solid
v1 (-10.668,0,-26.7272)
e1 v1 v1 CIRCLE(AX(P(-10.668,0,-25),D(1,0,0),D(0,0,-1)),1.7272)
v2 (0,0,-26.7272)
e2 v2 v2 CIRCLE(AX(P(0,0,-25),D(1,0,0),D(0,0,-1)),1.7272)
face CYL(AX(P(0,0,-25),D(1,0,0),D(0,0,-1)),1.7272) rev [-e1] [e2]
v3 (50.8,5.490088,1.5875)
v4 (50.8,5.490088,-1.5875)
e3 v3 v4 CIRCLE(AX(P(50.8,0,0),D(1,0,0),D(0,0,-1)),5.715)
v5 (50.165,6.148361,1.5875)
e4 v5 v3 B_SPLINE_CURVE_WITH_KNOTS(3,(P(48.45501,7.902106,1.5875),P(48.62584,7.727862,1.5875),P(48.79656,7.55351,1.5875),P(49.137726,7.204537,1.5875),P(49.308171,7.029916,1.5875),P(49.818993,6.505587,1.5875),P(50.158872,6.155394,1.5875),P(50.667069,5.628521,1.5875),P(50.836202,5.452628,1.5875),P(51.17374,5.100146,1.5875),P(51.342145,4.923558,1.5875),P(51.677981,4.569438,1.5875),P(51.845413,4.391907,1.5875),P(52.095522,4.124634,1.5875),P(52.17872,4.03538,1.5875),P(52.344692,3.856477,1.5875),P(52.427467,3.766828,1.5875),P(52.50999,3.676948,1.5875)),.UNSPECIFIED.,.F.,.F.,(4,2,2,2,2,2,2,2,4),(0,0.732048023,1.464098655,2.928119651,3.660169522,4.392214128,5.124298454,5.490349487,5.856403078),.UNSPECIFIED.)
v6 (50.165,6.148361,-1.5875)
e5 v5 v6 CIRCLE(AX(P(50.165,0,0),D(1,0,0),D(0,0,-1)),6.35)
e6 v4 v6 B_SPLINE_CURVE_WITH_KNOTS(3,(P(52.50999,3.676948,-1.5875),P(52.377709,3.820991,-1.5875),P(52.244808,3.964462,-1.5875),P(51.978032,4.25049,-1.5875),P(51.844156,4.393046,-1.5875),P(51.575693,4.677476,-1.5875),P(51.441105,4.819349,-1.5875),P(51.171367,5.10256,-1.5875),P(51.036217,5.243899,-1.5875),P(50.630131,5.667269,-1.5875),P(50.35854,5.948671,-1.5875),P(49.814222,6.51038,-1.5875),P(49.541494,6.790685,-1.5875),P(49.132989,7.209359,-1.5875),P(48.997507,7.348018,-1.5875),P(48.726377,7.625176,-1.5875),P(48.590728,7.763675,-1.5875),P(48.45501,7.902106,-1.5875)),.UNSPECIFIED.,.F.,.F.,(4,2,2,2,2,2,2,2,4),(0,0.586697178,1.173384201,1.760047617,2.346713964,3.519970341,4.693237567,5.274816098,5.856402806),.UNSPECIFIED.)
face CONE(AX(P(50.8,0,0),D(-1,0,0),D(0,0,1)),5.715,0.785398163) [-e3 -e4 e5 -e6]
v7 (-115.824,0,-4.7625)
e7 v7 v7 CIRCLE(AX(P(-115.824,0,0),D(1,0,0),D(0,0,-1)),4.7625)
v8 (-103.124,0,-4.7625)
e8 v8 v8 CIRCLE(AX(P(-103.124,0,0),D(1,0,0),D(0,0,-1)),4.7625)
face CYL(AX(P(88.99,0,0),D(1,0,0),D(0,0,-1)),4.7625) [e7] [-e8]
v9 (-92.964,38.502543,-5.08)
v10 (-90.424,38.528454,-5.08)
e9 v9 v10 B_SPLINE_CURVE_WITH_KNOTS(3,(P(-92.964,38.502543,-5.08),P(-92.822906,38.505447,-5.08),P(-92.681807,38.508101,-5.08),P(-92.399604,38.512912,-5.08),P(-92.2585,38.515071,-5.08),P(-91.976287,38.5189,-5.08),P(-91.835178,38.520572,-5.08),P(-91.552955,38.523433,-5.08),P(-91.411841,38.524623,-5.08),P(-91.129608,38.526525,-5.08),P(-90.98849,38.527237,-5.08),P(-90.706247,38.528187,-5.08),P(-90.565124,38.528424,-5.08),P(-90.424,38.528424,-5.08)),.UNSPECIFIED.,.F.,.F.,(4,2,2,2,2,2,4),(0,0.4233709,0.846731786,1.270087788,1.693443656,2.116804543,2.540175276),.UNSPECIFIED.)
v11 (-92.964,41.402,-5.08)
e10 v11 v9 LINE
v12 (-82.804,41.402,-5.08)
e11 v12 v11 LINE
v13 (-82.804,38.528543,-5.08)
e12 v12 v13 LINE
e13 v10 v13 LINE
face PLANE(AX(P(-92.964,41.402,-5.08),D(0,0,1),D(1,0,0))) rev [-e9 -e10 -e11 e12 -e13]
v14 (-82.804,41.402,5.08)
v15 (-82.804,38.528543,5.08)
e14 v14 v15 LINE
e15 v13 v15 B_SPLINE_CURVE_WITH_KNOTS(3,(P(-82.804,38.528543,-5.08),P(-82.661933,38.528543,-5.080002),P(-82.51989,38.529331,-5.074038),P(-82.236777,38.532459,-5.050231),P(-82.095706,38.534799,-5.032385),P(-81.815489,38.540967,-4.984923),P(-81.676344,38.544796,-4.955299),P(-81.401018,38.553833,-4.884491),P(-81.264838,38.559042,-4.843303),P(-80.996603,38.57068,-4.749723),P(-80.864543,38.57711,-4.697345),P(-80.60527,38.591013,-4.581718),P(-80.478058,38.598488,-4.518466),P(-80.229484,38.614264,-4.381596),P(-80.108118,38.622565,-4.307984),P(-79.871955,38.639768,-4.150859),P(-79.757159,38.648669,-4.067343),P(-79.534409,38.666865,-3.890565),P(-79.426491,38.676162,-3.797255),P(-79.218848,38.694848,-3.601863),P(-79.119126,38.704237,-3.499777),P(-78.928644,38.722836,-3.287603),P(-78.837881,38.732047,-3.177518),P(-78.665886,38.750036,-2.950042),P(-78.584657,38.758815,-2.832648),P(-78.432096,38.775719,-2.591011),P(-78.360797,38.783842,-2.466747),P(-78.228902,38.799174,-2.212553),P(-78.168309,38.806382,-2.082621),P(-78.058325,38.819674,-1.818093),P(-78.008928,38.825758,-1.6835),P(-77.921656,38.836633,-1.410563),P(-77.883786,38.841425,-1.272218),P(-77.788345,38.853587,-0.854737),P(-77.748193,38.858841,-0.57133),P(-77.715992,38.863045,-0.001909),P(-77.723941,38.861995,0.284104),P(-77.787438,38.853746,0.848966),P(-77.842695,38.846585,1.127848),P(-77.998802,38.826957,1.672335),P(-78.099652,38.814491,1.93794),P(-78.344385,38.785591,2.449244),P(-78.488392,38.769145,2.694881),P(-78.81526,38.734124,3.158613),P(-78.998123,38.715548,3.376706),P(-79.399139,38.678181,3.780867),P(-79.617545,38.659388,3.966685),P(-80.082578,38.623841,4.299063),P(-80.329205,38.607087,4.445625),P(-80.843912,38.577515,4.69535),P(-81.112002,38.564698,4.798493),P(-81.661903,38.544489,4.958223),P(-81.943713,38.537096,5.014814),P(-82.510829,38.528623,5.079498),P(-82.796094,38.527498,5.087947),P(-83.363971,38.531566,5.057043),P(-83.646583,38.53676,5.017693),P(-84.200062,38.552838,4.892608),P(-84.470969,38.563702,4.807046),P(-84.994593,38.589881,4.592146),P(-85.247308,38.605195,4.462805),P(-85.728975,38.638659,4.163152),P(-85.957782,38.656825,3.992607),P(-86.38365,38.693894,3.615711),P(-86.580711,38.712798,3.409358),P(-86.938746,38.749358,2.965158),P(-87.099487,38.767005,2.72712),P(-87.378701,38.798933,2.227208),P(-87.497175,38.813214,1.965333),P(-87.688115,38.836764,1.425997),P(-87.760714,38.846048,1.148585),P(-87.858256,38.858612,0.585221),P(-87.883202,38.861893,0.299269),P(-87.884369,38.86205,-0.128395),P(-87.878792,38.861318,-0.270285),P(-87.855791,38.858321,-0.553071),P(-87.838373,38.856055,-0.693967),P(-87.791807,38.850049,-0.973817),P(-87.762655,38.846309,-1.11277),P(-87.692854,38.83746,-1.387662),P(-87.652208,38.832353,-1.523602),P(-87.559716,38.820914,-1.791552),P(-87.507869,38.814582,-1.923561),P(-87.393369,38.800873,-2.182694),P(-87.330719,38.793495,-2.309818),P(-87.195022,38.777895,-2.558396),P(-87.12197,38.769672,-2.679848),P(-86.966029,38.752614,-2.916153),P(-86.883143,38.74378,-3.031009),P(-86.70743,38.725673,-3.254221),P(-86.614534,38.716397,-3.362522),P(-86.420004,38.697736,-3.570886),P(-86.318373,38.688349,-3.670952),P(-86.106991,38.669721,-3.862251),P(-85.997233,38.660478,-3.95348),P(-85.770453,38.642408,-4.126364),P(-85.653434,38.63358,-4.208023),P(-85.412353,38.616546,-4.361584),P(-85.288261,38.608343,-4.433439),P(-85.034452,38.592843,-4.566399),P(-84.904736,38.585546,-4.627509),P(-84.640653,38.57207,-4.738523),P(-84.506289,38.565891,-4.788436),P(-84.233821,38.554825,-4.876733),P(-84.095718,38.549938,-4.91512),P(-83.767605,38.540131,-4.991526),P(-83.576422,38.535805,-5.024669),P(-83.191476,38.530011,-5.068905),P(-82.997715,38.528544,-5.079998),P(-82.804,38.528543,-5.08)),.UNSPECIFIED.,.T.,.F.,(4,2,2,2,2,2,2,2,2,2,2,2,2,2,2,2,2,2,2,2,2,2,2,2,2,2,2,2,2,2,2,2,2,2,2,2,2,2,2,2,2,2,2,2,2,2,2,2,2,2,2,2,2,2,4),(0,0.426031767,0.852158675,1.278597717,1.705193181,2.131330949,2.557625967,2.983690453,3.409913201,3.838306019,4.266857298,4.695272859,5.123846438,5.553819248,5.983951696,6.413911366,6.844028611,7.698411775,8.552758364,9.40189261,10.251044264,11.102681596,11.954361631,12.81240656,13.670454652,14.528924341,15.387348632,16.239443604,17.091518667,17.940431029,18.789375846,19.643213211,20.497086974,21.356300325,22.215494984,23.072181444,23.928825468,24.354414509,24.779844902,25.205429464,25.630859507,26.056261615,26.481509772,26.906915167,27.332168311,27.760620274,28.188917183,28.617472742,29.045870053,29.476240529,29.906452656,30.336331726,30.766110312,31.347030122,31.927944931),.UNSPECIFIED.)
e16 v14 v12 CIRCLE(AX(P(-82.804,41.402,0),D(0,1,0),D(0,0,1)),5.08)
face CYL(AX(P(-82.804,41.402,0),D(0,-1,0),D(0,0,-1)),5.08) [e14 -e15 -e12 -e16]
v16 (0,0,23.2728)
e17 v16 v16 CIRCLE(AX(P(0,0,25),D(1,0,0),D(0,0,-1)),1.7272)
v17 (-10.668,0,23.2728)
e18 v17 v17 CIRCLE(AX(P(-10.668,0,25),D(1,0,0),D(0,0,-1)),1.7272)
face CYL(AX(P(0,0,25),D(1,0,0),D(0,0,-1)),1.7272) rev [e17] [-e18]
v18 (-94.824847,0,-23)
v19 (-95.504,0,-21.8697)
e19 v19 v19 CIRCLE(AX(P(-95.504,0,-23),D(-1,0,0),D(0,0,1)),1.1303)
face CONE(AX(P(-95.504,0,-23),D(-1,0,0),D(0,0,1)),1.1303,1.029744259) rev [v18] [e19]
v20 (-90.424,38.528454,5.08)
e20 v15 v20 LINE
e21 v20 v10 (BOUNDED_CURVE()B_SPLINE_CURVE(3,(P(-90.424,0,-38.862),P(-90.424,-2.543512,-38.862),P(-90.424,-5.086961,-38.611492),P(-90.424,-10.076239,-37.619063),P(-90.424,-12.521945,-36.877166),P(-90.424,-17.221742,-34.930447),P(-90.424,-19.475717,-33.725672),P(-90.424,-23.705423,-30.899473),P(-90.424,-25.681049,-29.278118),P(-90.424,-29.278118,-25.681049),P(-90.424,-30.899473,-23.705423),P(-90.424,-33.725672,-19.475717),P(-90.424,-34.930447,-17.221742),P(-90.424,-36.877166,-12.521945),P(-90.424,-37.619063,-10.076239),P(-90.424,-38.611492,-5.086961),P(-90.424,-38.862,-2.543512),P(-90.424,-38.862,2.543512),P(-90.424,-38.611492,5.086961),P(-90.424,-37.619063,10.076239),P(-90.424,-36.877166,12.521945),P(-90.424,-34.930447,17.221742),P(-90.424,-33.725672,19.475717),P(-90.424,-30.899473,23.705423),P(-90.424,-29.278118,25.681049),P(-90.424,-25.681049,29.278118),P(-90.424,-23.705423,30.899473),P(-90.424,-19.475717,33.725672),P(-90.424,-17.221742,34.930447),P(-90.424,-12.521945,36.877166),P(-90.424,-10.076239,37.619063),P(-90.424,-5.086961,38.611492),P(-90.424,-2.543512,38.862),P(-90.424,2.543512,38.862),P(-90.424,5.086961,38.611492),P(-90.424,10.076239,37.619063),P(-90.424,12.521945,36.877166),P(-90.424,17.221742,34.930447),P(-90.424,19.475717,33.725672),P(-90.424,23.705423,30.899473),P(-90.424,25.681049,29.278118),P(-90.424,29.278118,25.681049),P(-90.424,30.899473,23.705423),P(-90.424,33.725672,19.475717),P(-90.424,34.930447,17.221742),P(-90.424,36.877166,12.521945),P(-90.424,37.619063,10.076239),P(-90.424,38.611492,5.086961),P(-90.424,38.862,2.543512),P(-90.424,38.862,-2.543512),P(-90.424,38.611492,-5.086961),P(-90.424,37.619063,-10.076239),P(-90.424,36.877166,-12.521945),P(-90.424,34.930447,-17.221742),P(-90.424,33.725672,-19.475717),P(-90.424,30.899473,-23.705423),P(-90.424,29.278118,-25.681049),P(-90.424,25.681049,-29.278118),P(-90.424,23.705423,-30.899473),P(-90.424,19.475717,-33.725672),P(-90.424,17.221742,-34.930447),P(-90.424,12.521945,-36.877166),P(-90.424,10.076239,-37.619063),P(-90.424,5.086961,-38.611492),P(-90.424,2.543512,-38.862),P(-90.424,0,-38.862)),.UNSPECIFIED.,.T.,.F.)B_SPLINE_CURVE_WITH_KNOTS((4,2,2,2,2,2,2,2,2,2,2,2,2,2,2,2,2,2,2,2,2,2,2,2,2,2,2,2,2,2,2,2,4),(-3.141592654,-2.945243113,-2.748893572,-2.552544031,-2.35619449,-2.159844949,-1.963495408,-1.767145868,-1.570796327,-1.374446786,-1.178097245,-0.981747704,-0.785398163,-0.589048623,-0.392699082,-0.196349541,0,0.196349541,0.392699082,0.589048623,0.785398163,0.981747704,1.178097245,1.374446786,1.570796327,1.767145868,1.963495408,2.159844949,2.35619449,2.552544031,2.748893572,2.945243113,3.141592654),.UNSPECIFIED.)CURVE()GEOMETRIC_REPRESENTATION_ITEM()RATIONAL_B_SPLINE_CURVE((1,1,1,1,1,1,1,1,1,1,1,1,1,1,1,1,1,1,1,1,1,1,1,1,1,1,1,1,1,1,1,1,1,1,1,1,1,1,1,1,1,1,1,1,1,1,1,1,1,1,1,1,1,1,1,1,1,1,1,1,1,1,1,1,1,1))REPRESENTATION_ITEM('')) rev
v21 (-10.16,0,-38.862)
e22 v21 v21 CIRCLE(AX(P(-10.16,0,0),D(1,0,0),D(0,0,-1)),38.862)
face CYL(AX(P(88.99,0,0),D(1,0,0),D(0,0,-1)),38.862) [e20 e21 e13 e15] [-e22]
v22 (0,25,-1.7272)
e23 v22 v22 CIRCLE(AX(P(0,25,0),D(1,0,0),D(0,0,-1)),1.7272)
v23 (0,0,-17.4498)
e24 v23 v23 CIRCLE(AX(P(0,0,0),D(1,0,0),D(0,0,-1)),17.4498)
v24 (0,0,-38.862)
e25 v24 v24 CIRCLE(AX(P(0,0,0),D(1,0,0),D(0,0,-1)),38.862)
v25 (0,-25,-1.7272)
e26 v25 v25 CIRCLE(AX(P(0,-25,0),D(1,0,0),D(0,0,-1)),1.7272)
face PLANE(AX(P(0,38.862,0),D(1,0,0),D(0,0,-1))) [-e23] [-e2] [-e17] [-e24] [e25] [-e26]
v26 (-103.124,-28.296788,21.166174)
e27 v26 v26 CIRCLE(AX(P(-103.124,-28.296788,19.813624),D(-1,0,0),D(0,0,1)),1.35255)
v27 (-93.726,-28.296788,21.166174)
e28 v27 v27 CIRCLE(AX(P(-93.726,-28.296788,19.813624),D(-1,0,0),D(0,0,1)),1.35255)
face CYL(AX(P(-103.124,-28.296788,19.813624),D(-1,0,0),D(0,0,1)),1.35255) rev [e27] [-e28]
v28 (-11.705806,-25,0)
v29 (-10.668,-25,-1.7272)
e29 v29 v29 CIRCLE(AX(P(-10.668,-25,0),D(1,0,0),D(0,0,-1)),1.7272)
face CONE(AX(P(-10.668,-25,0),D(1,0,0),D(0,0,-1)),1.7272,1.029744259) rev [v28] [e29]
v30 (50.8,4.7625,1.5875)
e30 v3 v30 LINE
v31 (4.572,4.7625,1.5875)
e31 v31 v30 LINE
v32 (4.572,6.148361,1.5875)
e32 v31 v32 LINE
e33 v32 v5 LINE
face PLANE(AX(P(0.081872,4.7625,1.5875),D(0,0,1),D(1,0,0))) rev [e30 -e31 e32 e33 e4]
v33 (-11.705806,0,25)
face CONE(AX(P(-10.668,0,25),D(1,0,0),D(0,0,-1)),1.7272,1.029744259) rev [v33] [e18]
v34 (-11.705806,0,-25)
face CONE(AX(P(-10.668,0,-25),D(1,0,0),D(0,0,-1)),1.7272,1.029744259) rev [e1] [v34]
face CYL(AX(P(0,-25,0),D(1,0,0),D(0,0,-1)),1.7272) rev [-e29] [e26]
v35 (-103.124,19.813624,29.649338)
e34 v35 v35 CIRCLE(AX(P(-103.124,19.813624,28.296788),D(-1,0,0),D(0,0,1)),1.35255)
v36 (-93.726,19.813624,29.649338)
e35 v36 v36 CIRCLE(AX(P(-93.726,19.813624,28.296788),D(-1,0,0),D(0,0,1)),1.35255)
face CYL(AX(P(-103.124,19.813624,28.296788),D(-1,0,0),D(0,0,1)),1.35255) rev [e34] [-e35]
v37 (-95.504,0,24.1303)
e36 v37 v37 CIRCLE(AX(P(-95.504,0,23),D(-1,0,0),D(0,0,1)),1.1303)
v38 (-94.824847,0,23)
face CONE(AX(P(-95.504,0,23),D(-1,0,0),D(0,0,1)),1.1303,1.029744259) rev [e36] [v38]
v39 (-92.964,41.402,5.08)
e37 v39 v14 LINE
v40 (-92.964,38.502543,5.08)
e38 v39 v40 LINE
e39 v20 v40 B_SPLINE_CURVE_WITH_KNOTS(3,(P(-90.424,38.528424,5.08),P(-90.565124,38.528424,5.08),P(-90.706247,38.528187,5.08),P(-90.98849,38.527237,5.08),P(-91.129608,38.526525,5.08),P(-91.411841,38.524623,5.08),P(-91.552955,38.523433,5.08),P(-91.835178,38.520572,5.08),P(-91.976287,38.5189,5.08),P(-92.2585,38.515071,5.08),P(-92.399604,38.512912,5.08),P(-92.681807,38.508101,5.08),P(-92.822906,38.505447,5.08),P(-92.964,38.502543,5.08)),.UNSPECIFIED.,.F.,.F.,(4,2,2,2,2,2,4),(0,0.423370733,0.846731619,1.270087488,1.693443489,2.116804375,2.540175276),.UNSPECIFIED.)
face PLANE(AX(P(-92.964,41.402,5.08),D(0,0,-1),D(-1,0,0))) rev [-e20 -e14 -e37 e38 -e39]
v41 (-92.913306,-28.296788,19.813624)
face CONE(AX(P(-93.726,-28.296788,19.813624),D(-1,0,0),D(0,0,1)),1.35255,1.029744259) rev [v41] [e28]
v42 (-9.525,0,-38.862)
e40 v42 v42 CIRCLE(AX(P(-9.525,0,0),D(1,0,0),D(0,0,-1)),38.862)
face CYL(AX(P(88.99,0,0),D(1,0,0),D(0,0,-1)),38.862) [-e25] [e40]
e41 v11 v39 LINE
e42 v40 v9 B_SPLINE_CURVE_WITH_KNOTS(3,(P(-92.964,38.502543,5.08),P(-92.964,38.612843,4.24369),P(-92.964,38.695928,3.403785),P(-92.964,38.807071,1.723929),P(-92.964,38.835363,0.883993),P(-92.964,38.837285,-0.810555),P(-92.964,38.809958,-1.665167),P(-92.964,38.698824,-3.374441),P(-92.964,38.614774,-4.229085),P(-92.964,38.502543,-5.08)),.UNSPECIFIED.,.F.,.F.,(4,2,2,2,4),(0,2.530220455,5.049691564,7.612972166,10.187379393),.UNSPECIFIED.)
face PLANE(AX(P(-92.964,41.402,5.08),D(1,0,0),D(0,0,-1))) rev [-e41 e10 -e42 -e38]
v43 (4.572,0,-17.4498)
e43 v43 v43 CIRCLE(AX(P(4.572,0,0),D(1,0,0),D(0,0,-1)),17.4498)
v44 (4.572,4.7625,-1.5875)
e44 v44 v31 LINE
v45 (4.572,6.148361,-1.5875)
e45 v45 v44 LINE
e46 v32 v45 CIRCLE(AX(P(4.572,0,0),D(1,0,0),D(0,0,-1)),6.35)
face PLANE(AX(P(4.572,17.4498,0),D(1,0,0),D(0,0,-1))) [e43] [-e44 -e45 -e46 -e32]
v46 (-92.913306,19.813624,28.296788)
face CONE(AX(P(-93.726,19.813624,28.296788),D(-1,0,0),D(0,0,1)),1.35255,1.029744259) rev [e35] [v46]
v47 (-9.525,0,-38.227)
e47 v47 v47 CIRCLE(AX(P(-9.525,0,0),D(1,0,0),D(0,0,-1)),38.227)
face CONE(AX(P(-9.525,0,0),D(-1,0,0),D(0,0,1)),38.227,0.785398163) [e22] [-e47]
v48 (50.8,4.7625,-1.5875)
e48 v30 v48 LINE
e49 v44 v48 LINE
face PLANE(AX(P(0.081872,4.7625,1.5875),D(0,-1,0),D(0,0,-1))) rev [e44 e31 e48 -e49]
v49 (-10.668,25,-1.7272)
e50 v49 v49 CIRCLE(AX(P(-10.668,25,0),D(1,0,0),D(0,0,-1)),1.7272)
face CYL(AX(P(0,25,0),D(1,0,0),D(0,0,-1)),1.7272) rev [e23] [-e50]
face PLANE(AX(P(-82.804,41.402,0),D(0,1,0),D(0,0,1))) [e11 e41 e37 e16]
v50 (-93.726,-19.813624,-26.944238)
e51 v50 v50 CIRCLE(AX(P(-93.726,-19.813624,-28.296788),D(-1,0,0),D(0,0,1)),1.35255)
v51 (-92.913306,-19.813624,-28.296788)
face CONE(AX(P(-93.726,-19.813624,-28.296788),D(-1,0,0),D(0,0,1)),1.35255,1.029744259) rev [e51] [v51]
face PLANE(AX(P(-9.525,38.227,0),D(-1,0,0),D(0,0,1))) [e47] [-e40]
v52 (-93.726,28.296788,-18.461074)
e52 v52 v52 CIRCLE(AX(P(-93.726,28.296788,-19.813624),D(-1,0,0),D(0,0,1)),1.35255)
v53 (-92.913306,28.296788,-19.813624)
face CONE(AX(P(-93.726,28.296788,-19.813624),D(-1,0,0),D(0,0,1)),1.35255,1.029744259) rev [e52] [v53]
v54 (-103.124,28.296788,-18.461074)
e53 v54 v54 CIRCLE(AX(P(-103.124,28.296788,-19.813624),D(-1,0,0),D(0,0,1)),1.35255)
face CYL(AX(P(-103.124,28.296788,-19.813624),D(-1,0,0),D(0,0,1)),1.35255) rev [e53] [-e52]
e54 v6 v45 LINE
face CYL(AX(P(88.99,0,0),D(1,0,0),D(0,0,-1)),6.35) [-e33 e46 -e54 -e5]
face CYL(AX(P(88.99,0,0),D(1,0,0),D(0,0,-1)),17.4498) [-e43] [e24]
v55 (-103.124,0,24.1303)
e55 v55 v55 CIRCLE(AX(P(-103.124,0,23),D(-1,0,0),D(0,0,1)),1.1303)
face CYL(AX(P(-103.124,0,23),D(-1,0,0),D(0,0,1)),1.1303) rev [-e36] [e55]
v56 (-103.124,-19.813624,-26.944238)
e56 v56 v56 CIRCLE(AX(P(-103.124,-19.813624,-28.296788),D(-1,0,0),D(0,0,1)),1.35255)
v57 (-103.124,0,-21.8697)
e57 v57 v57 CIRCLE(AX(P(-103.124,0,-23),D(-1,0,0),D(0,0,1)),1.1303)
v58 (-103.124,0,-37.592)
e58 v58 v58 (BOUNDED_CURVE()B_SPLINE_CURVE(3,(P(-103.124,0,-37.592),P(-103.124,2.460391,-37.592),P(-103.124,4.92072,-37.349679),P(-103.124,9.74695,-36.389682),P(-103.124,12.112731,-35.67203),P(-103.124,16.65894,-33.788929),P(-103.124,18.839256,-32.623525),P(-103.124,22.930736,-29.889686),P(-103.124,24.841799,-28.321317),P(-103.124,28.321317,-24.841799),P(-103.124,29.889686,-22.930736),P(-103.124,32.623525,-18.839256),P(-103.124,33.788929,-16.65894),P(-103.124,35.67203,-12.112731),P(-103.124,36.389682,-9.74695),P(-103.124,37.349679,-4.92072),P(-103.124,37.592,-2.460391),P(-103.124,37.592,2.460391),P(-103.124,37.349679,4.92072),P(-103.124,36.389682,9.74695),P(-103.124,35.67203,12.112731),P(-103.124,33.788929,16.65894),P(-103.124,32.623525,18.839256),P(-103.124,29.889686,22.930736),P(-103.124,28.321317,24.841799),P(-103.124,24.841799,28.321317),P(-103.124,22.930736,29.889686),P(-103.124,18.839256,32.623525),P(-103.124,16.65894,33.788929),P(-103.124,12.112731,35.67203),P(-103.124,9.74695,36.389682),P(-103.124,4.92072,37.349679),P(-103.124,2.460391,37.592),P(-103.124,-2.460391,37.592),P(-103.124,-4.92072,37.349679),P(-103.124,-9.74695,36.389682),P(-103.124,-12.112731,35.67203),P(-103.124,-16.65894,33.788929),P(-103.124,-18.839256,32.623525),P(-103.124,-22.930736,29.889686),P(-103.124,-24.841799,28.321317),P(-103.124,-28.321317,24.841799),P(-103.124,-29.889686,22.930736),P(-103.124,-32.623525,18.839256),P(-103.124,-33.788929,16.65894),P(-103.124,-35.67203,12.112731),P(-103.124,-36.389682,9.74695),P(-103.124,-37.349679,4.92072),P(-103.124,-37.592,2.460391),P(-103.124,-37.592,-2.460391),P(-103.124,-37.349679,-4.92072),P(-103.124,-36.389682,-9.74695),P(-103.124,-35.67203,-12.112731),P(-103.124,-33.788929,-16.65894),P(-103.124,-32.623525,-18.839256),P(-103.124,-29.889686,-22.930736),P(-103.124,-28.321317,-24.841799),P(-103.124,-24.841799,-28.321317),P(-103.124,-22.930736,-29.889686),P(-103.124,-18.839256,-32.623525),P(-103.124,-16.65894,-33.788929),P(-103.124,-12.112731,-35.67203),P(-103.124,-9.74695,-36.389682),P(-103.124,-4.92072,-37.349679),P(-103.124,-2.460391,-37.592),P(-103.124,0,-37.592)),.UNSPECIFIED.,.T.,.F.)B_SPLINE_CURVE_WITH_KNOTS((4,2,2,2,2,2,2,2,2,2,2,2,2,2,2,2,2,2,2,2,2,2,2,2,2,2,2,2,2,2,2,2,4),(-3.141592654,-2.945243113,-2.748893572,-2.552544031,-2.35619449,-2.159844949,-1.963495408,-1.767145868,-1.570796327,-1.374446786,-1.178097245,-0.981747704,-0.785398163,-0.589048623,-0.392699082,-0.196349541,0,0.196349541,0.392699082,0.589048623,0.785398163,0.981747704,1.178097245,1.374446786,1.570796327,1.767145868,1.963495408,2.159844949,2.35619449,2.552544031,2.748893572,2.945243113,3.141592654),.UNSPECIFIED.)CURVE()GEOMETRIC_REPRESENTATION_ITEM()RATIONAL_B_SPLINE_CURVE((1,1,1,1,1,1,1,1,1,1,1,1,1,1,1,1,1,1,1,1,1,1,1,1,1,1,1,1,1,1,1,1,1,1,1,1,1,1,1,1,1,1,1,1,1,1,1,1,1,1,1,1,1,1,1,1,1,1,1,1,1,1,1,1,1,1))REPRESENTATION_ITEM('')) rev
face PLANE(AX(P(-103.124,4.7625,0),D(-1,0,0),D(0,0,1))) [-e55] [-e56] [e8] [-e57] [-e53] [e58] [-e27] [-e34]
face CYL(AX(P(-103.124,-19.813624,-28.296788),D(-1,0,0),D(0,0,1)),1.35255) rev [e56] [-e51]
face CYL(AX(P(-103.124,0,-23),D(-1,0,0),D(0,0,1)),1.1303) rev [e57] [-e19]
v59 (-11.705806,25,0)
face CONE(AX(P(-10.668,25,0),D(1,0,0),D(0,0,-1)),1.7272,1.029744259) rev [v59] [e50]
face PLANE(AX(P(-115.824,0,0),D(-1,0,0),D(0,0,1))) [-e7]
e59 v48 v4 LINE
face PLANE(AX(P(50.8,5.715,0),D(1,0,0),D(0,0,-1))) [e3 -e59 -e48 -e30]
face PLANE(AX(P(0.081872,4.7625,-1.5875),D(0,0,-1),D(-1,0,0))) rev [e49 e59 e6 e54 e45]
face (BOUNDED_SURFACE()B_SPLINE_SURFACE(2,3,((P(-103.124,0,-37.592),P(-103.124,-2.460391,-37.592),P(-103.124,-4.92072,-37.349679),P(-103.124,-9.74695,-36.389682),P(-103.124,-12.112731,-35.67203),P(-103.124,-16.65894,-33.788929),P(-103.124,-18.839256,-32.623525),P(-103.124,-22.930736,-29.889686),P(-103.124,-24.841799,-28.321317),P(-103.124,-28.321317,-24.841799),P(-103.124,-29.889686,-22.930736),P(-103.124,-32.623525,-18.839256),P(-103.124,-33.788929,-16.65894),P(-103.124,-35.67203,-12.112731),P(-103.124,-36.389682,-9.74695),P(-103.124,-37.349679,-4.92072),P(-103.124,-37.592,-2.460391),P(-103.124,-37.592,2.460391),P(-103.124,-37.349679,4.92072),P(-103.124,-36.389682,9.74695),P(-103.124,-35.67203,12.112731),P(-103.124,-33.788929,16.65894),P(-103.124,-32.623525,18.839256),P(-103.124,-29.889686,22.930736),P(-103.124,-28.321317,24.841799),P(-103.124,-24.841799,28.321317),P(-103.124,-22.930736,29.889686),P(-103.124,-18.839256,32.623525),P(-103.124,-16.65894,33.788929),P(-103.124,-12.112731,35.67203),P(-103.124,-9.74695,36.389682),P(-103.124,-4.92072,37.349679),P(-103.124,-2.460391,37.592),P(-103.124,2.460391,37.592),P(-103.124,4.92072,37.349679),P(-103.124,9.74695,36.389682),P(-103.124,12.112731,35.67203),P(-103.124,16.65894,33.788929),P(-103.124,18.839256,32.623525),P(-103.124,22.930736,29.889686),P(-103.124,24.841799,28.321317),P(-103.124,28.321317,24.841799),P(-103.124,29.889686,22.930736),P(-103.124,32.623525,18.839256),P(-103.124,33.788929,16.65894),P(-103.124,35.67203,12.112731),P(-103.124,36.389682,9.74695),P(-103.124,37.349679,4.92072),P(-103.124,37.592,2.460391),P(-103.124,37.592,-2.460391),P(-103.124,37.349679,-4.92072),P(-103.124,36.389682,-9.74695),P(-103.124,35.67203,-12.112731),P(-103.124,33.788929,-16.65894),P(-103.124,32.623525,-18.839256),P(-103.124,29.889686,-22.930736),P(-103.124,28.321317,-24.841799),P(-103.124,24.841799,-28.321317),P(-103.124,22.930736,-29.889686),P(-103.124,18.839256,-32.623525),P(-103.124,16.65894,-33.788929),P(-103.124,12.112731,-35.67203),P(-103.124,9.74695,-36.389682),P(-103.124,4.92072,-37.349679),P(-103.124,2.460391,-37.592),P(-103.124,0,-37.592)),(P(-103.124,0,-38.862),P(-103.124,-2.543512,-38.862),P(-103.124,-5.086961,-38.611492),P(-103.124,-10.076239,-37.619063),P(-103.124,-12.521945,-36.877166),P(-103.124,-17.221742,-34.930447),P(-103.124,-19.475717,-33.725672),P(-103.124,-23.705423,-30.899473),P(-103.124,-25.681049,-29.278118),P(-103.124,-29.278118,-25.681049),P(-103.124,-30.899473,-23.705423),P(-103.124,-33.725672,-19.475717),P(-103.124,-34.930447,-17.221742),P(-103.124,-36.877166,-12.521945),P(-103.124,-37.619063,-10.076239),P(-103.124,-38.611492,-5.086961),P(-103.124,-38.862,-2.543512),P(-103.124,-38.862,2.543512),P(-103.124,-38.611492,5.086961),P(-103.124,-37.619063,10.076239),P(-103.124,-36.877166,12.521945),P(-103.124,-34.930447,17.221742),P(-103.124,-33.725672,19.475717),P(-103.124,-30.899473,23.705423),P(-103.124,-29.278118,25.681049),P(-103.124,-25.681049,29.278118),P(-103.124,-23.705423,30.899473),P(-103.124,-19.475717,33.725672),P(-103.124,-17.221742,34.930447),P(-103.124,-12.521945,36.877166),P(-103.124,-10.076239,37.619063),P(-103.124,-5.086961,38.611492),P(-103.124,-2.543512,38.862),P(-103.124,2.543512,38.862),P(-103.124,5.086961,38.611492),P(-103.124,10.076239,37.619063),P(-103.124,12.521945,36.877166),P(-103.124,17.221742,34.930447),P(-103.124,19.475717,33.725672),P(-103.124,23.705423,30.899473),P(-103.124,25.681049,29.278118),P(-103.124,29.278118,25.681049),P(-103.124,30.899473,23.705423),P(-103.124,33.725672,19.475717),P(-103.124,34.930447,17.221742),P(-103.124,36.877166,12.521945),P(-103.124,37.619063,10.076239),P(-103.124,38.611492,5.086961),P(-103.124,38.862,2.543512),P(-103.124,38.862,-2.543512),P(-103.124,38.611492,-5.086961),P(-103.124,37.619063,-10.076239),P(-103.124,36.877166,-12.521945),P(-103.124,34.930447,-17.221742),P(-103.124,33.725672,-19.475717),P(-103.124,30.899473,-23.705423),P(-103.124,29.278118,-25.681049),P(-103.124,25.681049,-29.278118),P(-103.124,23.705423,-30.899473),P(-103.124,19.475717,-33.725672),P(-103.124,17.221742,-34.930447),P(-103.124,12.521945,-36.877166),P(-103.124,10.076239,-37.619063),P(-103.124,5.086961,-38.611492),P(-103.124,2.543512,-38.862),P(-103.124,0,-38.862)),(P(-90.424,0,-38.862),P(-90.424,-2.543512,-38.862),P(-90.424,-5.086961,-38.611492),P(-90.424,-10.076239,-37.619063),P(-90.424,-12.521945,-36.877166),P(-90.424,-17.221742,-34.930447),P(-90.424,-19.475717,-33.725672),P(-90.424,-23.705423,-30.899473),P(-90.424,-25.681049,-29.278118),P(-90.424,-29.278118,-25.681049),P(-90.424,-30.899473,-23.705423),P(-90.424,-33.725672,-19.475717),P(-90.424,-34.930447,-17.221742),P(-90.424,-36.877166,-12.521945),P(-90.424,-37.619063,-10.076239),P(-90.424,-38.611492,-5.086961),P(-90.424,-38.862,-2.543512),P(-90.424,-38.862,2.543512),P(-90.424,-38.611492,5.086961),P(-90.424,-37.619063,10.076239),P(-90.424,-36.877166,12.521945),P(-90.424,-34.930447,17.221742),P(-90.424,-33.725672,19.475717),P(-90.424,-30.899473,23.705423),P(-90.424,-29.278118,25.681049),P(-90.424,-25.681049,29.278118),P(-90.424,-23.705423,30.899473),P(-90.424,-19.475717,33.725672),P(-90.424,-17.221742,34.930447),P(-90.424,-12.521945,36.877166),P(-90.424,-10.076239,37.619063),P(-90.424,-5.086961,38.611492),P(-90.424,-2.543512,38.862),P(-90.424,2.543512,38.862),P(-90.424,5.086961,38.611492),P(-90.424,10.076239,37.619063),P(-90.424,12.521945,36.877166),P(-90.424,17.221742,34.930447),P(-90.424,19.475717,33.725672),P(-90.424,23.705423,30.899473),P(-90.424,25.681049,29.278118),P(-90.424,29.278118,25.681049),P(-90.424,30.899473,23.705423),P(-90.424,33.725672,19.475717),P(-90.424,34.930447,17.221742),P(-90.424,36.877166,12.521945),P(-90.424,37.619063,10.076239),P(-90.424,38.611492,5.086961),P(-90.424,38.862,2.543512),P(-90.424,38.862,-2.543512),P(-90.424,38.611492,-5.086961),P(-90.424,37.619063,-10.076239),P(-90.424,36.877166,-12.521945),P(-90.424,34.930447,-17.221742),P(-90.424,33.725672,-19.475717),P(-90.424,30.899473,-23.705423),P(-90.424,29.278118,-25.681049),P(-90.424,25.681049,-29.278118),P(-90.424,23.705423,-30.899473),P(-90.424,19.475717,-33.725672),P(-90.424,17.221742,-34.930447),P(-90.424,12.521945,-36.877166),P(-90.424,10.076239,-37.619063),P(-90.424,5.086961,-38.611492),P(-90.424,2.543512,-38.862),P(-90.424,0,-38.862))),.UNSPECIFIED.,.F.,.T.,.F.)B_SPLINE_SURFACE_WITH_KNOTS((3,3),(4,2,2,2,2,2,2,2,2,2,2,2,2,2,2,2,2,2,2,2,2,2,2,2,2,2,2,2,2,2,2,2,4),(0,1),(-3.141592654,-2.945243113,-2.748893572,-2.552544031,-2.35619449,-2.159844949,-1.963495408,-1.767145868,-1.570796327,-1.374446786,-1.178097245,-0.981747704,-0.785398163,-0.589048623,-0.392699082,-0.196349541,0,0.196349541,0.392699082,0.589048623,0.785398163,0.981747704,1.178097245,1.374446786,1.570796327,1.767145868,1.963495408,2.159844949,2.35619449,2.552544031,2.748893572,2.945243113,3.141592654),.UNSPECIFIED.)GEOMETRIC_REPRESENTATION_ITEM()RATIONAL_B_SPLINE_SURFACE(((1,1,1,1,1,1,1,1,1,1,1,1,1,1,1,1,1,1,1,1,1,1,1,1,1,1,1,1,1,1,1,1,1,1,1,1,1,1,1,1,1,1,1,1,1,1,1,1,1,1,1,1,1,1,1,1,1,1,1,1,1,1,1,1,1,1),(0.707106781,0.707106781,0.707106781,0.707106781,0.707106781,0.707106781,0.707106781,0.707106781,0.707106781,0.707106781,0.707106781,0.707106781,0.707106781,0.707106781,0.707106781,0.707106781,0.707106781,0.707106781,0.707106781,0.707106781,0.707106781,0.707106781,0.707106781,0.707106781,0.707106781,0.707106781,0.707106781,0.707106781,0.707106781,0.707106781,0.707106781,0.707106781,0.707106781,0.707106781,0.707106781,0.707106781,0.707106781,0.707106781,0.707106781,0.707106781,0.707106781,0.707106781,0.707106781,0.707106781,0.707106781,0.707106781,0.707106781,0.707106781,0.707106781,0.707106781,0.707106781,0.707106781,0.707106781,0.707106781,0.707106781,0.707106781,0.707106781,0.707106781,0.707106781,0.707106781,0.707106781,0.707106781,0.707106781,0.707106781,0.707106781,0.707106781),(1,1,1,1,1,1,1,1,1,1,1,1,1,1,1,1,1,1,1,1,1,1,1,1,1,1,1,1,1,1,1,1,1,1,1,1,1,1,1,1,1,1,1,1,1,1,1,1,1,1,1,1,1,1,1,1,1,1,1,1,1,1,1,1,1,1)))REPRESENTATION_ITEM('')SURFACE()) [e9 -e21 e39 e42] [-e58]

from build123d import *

# Parameters (mm, degrees)
FILLET1_SIZE              = 1.27
FILLET1_SIZE_2            = 12.7
SKETCH3_W                 = 3.175
SKETCH3_H                 = 3.175
CUT_EXTRUDE1_DEPTH        = 46.228
F_4_40_TAPPED_HOLE1_D     = 2.2606
F_4_40_TAPPED_HOLE1_DEPTH = 7.62
F_4_40_TAPPED_HOLE1_TIP   = 0.679152758
CIRPATTERN1_COUNT         = 4
BOSS_EXTRUDE1_DEPTH       = 41.402


# Read off the part's stored shape, not the designer's step: #6-32 Tapped Hole1
with BuildPart() as part:
    # Sketch2 → Revolve1 (revolve)
    with BuildSketch(Plane.XY, mode=Mode.PRIVATE) as revolve1_sk:
        Polygon((50.8, 0), (-115.824, 0), (-115.824, 4.7625), (-103.124, 4.7625), (-103.124, 38.862), (-10.16, 38.862), (-9.525, 38.227), (-9.525, 38.862), (0, 38.862), (0, 17.4498), (4.572, 17.4498), (4.572, 6.35), (50.165, 6.35), (50.8, 5.715), align=None)
    revolve(revolve1_sk.sketch.rotate(Axis((88.99, 0, 0), (-1, 0, 0)), 90), axis=Axis((88.99, 0, 0), (-1, 0, 0)))

    # Fillet1
    # an asymmetric fillet: 12.7, 1.27 mm, written as the material it takes off along each edge
    with BuildSketch(Plane(origin=(-103.124, 0, 0), x_dir=(0, 0, -1), z_dir=(0, 1, 0))) as fillet1_piece_1:
        with BuildLine():
            Bezier((38.862 - FILLET1_SIZE, 0), (38.862, 0), (38.862, -FILLET1_SIZE_2), weights=[1, 0.707106781, 1])
            Line((38.862, -FILLET1_SIZE_2), (38.862, 0))
            Line((38.862, 0), (38.862 - FILLET1_SIZE, 0))
        make_face()
    revolve(axis=Axis((-103.124, 0, 0), (-1, 0, 0)), mode=Mode.SUBTRACT)

    # Sketch3 → Cut-Extrude1 (cut)
    with BuildSketch(Plane(origin=(50.8, 0, 0), x_dir=(0, 0, -1), z_dir=(1, 0, 0))):
        with Locations((0, 6.35)):
            Rectangle(SKETCH3_W, SKETCH3_H)
    extrude(amount=-CUT_EXTRUDE1_DEPTH, mode=Mode.SUBTRACT)

    # Sketch8 → #8-32 Tapped Hole3 (revolve, cut)
    with BuildSketch(Plane(origin=(0, 0, -25), x_dir=(0, 0, -1), z_dir=(0, 1, 0))):
        Polygon((0, 0), (0, 11.705806461), (1.7272, 10.668), (1.7272, 0), align=None)
    f_8_32_tapped_hole3 = revolve(axis=Axis((6.35, 0, -25), (-1, 0, 0)), mode=Mode.SUBTRACT)

    # #6-32 Tapped Hole1 outline → #6-32 Tapped Hole1 (revolve, cut)
    with BuildSketch(Plane(origin=(0, 19.813624417, 28.296788218), x_dir=(0, 1, 0), z_dir=(0, 0, -1))):
        Polygon((1.35255, -93.726), (0, -92.91330597), (0, -103.124), (1.35255, -103.124), align=None)
    f_6_32_tapped_hole1 = revolve(axis=Axis((0, 19.813624417, 28.296788218), (1, 0, 0)), mode=Mode.SUBTRACT)

    # #4-40 Tapped Hole1
    with Locations(Plane.ZY.offset(103.124)):
        with Locations((-23, 0), (23, 0)):
            Hole(F_4_40_TAPPED_HOLE1_D / 2, depth=F_4_40_TAPPED_HOLE1_DEPTH)
            with Locations((0, 0, -(F_4_40_TAPPED_HOLE1_DEPTH + F_4_40_TAPPED_HOLE1_TIP / 2))):  # 118° drill point
                Cone(0, F_4_40_TAPPED_HOLE1_D / 2, F_4_40_TAPPED_HOLE1_TIP, mode=Mode.SUBTRACT)

    # CirPattern1: #8-32 Tapped Hole3, #6-32 Tapped Hole1 ×4 about axis
    cirpattern1_axis = Axis((0, 0, 0), (1, 0, 0))
    add([f_8_32_tapped_hole3.rotate(cirpattern1_axis, i * 360 / CIRPATTERN1_COUNT) for i in range(1, CIRPATTERN1_COUNT)], mode=Mode.SUBTRACT)
    add([f_6_32_tapped_hole1.rotate(cirpattern1_axis, i * 360 / CIRPATTERN1_COUNT) for i in range(1, CIRPATTERN1_COUNT)], mode=Mode.SUBTRACT)

    # Sketch12 → Boss-Extrude1 (add)
    with BuildSketch(Plane(origin=(0, 0, 0), x_dir=(1, 0, 0), z_dir=(0, 1, 0))):
        with BuildLine():
            Line((-92.964, -5.08), (-82.804, -5.08))
            ThreePointArc((-82.804, -5.08), (-77.724, 0), (-82.804, 5.08))
            Line((-82.804, 5.08), (-92.964, 5.08))
            Line((-92.964, 5.08), (-92.964, -5.08))
        make_face()
    extrude(amount=BOSS_EXTRUDE1_DEPTH)


solid = part.part
